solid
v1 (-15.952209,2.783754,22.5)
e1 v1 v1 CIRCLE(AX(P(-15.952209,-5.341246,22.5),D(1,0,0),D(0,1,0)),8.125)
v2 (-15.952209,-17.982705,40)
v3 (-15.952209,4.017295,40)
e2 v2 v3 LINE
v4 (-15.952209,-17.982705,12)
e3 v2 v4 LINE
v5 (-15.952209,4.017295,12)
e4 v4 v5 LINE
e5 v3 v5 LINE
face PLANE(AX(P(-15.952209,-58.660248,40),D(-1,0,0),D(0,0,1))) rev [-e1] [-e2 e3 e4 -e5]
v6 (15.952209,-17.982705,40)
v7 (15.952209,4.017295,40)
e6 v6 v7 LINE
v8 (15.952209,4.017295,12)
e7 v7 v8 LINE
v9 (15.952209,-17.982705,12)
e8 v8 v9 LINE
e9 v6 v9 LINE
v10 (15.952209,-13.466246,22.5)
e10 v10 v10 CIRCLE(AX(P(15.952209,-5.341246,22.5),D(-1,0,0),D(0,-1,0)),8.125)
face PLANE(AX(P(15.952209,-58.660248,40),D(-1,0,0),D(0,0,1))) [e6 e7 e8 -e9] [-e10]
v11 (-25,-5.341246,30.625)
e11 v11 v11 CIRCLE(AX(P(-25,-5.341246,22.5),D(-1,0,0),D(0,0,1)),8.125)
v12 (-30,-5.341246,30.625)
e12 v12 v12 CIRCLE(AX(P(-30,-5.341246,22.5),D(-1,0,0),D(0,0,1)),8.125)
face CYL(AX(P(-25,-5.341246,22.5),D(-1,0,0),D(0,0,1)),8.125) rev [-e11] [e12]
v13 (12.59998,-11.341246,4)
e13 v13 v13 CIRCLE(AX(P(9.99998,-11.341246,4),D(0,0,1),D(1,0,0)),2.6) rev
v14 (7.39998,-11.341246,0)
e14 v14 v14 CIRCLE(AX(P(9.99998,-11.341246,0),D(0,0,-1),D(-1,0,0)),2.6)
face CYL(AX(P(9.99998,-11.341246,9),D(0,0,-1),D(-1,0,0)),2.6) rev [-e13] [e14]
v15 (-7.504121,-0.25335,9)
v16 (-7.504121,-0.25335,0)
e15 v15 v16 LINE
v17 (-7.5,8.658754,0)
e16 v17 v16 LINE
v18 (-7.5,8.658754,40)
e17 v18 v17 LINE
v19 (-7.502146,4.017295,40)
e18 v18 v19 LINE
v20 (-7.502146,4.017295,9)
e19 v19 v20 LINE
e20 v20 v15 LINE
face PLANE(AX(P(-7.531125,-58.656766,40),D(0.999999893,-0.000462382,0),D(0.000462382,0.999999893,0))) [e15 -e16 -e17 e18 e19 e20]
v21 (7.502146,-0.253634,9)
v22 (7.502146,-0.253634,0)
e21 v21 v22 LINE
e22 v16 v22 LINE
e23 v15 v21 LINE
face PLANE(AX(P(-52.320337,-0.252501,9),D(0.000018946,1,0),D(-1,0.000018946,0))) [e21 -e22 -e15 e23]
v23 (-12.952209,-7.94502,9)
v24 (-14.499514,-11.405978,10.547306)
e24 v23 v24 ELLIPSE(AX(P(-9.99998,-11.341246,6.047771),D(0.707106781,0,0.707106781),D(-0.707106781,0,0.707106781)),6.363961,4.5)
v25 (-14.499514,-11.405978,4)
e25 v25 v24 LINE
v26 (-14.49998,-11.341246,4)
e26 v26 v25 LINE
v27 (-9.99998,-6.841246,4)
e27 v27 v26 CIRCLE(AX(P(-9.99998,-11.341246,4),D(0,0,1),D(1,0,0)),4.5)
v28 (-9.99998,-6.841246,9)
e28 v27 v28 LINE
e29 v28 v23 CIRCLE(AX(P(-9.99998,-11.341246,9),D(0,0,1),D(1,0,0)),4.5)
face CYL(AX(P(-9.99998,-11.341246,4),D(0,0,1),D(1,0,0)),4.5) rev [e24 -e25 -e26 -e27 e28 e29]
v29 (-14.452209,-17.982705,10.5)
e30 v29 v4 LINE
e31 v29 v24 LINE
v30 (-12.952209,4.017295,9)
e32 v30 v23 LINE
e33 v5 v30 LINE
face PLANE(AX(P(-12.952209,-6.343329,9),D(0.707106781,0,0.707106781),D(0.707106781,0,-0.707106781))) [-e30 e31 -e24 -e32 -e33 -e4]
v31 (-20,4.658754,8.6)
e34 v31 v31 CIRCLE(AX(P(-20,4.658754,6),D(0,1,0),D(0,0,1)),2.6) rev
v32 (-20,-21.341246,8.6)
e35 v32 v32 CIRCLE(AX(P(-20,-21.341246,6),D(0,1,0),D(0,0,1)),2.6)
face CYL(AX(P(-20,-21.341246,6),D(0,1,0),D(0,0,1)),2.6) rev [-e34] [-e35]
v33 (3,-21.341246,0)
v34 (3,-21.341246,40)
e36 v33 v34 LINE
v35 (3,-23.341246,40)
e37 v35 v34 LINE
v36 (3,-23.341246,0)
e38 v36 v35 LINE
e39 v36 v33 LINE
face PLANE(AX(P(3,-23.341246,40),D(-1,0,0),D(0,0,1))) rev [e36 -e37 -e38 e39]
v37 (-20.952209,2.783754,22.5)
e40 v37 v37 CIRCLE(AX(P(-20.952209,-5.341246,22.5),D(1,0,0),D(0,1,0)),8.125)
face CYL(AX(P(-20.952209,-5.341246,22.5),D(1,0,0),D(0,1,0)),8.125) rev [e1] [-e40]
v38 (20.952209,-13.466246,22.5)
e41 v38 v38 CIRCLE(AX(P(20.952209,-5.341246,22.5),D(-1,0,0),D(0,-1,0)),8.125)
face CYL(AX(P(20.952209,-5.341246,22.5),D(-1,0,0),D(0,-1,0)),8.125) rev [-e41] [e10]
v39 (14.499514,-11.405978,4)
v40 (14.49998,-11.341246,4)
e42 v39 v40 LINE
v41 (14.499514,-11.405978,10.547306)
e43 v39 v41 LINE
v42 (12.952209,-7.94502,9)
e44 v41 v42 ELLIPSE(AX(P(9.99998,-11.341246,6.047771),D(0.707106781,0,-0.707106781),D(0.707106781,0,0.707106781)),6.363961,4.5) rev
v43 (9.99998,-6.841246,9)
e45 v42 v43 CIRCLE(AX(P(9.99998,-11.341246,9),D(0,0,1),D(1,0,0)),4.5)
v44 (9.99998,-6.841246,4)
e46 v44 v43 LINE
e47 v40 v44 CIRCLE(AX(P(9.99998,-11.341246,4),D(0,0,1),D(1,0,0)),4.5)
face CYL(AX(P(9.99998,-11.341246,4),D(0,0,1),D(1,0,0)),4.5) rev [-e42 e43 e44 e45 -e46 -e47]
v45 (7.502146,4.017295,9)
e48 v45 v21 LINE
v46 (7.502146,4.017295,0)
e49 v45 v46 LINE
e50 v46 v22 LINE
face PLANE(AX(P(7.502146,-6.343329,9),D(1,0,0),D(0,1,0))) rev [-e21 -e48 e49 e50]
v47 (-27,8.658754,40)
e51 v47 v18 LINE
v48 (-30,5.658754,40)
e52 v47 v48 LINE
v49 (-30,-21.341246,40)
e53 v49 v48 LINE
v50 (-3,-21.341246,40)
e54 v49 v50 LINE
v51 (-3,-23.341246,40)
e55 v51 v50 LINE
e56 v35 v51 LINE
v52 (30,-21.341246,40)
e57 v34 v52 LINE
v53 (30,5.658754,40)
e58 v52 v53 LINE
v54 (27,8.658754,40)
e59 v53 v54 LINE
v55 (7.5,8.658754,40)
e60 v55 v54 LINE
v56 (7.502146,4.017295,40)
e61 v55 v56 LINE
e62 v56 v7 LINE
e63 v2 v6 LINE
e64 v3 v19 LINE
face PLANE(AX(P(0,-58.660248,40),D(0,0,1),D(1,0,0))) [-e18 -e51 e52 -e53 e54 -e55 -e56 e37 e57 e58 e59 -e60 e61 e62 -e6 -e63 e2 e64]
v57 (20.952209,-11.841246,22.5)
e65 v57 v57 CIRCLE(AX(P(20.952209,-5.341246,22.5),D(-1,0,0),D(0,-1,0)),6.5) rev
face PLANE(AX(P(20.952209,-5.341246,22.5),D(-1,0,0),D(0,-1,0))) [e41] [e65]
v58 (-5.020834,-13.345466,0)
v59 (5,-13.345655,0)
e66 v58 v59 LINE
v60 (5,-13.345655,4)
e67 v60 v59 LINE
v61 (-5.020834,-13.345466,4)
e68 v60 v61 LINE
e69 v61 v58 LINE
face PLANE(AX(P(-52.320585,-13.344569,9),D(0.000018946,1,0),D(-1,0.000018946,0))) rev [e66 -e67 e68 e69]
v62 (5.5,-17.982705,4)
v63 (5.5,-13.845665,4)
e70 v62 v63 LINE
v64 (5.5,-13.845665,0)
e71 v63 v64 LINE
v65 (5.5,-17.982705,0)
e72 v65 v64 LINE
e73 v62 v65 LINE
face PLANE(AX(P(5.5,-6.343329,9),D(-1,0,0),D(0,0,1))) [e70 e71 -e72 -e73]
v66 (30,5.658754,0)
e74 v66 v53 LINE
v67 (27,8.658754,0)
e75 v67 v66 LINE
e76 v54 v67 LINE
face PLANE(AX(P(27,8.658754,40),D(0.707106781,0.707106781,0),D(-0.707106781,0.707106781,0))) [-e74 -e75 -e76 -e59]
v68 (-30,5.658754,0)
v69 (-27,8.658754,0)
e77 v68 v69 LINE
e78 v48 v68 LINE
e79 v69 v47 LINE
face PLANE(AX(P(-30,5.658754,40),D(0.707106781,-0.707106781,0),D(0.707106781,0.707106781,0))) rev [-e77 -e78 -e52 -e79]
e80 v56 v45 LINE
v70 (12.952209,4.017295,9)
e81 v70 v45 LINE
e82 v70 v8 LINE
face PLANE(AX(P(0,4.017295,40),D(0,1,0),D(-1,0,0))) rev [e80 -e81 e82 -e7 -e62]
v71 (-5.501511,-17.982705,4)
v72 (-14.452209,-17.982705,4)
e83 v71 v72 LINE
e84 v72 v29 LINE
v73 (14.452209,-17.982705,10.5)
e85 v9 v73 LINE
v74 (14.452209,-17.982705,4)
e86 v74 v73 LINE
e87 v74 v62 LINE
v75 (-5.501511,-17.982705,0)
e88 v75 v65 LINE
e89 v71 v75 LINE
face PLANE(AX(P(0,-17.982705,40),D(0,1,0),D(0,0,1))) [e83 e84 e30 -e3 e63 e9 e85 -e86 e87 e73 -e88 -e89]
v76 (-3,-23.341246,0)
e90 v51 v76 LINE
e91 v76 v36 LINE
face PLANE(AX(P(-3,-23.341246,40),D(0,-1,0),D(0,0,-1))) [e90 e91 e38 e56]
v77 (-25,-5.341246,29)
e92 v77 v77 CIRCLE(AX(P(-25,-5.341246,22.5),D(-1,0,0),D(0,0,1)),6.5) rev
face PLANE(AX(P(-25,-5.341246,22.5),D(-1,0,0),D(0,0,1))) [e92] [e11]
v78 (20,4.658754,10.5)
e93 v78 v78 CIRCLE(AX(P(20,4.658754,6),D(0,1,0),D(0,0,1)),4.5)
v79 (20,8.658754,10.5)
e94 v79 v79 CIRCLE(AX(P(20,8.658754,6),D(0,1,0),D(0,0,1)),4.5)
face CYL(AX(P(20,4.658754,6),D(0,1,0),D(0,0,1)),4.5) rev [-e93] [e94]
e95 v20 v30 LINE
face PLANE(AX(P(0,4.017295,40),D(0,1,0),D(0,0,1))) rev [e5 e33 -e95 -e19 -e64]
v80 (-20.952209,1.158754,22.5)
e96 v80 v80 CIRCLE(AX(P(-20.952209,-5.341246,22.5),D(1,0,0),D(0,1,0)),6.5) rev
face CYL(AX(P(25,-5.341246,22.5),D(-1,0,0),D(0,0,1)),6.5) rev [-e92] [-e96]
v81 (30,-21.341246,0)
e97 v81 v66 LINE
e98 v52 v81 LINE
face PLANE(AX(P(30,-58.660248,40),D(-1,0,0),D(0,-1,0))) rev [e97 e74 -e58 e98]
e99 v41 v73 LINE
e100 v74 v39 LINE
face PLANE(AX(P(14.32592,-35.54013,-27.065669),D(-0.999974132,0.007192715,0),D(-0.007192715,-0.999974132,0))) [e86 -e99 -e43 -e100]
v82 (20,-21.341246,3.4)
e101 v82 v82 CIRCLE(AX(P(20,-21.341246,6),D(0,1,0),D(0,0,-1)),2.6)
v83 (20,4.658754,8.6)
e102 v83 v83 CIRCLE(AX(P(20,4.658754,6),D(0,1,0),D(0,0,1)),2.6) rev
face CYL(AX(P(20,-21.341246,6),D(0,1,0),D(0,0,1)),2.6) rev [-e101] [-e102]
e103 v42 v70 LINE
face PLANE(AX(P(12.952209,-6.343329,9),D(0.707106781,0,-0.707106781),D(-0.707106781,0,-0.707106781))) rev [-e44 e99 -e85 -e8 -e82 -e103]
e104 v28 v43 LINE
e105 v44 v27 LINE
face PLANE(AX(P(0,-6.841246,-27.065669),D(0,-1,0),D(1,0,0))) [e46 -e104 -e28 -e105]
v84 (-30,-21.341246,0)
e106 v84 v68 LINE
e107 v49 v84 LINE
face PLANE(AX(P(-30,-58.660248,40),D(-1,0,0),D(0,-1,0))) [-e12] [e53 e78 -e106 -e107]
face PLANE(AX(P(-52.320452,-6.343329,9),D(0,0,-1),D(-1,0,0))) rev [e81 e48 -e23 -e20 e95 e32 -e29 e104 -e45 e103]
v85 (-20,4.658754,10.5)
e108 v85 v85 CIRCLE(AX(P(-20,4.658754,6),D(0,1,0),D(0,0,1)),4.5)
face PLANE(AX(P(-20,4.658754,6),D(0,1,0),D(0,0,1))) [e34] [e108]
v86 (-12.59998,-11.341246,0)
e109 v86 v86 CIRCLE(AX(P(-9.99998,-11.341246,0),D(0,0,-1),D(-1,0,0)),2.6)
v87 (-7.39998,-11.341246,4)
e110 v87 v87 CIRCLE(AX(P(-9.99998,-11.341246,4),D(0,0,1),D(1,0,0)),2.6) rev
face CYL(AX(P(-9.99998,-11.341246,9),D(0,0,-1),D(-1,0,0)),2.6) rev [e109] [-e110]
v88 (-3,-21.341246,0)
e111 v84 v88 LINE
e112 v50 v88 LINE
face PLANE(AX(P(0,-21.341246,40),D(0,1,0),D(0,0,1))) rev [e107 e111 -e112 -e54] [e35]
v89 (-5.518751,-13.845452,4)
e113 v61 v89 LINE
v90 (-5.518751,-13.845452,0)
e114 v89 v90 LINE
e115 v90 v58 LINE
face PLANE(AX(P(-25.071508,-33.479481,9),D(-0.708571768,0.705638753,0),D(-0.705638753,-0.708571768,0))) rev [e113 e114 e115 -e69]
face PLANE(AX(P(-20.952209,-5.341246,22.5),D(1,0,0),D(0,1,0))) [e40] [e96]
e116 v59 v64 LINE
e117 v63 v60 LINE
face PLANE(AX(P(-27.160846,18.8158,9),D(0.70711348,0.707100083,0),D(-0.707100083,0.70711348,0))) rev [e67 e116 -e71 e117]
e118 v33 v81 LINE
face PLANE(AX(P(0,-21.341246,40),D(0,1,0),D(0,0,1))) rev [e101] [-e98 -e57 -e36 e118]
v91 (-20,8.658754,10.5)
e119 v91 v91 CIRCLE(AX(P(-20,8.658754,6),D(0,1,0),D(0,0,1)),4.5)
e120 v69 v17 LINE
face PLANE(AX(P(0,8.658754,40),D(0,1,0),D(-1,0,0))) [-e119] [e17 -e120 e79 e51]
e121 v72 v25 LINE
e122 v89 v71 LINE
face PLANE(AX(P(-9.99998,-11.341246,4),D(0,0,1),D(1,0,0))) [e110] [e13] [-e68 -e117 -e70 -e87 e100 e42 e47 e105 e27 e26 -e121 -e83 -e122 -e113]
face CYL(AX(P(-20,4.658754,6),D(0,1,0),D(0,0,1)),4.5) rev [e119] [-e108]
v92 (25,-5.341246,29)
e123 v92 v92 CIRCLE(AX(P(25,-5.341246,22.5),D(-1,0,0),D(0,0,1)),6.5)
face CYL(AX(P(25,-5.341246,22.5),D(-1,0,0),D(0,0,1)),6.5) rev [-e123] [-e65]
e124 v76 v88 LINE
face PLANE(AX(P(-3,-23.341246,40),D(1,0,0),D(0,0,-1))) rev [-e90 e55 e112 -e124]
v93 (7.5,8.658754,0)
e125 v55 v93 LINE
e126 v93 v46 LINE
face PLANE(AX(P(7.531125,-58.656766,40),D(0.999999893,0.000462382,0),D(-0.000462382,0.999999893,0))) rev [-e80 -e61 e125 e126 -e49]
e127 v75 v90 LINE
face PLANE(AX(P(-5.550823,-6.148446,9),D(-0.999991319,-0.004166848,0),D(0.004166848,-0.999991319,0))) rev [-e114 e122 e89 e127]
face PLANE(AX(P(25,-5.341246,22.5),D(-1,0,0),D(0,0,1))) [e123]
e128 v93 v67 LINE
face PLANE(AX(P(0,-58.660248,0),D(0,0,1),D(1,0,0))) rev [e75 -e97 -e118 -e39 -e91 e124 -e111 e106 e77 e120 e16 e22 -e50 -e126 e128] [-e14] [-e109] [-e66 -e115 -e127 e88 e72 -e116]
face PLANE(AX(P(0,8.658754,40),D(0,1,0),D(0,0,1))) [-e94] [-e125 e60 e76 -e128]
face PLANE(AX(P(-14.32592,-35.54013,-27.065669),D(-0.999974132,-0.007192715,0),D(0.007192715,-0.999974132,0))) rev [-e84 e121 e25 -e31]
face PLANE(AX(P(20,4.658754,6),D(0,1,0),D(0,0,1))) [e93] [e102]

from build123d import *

# Parameters (mm, degrees)
BOSS_EXTRUDE1_DEPTH = 40
SKETCH2_R           = 2.6
BOSS_EXTRUDE2_DEPTH = 9
SKETCH3_R           = 4.5
CUT_EXTRUDE1_DEPTH  = 5
SKETCH4_R           = 2.6
CUT_EXTRUDE2_DEPTH  = 59.309518948
CHAMFER1_SIZE       = 3
SKETCH5_R           = 6.5
CUT_EXTRUDE3_DEPTH  = 55
SKETCH6_R           = 8.125
CUT_EXTRUDE4_DEPTH  = 5
CUT_EXTRUDE5_START  = -5
SKETCH7_R           = 8.125
CUT_EXTRUDE5_DEPTH  = 5
SKETCH8_R           = 8.125
CUT_EXTRUDE6_DEPTH  = 5
SKETCH9_R           = 4.5
CUT_EXTRUDE7_DEPTH  = 4
CHAMFER2_SIZE       = 3
SKETCH10_W          = 6
SKETCH10_H          = 40
BOSS_EXTRUDE3_DEPTH = 2
CUT_EXTRUDE8_DEPTH  = 5
CUT_EXTRUDE9_DEPTH  = 36


with BuildPart() as part:
    # Sketch1 → Boss-Extrude1 (new body)
    with BuildSketch(Plane.XY):
        Polygon((30, -21.341245707), (30, 8.658754293), (7.5, 8.658754293), (7.502146126, 4.017294787), (15.952208639, 4.017294787), (15.952208639, -17.982705213), (-15.952208639, -17.982705213), (-15.952208639, 4.017294787), (-7.502146126, 4.017294787), (-7.5, 8.658754293), (-30, 8.658754293), (-30, -21.341245707), align=None)
    extrude(amount=BOSS_EXTRUDE1_DEPTH)

    # Sketch2 → Boss-Extrude2 (add)
    with BuildSketch(Plane(origin=(0, 0, 0), x_dir=(-1, 0, 0), z_dir=(0, 0, -1))):
        Polygon((-7.502146126, -0.25363415), (-7.502146126, 4.017294787), (-15.952208639, 4.017294787), (-15.952208639, -17.982705213), (-5.499999997, -17.982705213), (-5.499999997, -13.845664874), (-4.999999997, -13.345655401), (5.020834238, -13.345465543), (5.518750814, -13.845451729), (5.50151136, -17.982705213), (15.952208639, -17.982705213), (15.952208639, 4.017294787), (7.502146126, 4.017294787), (7.504120794, -0.253349836), align=None)
        with Locations((-9.99998, -11.341245707)):
            Circle(SKETCH2_R, mode=Mode.SUBTRACT)
        with Locations((9.99998, -11.341245707)):
            Circle(SKETCH2_R, mode=Mode.SUBTRACT)
    extrude(amount=-BOSS_EXTRUDE2_DEPTH)

    # Sketch3 → Cut-Extrude1 (cut)
    with BuildSketch(Plane.XY.offset(9)):
        with Locations((-9.99998, -11.341245707)):
            Circle(SKETCH3_R)
        with Locations((9.99998, -11.341245707)):
            Circle(SKETCH3_R)
    extrude(amount=-CUT_EXTRUDE1_DEPTH, mode=Mode.SUBTRACT)

    # Sketch4 → Cut-Extrude2 (cut, through all)
    with BuildSketch(Plane(origin=(0, 8.658754293, 0), x_dir=(1, 0, 0), z_dir=(0, 1, 0))):
        with Locations(Location((-20, -6, 0), (0, 0, 270))):
            Circle(SKETCH4_R)
        with Locations(Location((20, -6, 0), (0, 0, 90))):
            Circle(SKETCH4_R)
    extrude(amount=-CUT_EXTRUDE2_DEPTH, mode=Mode.SUBTRACT)

    # Chamfer1
    # the kernel refuses this chamfer: 3 mm, written as the material it adds along each edge
    with BuildSketch(Plane(origin=(15.952208639, 4.017294787, 9), x_dir=(0.02749587661058678, 0, 0.9996219169112968), z_dir=(0, -1, 0))) as chamfer1_piece_1_section:
        Polygon((CHAMFER1_SIZE * 0.999621916911, CHAMFER1_SIZE * 0.0274958766106), (-CHAMFER1_SIZE * 0.0274958766106, CHAMFER1_SIZE * 0.999621916911), (0, 0), align=None)
    chamfer1_piece_1 = extrude(amount=22, mode=Mode.PRIVATE)
    chamfer1_piece_1 = chamfer1_piece_1 - Plane(origin=(9.99998, -11.341245707, 10.026917349), x_dir=(1, 0, 0), z_dir=(0, 0, 1)) * Cylinder(4.5, 56, mode=Mode.PRIVATE)
    add(chamfer1_piece_1)
    with BuildSketch(Plane(origin=(-15.952208639, -17.982705213, 9), x_dir=(-0.02749587661058678, 0, 0.9996219169112968), z_dir=(0, 1, 0))) as chamfer1_piece_2_section:
        Polygon((CHAMFER1_SIZE * 0.999621916911, CHAMFER1_SIZE * 0.0274958766106), (-CHAMFER1_SIZE * 0.0274958766106, CHAMFER1_SIZE * 0.999621916911), (0, 0), align=None)
    chamfer1_piece_2 = extrude(amount=22, mode=Mode.PRIVATE)
    chamfer1_piece_2 = chamfer1_piece_2 - Plane(origin=(-9.99998, -11.341245707, 10.026917349), x_dir=(1, 0, 0), z_dir=(0, 0, 1)) * Cylinder(4.5, 56, mode=Mode.PRIVATE)
    add(chamfer1_piece_2)

    # Sketch5 → Cut-Extrude3 (cut)
    with BuildSketch(Plane.ZY.offset(30)):
        with Locations((22.5, -5.341245707)):
            Circle(SKETCH5_R)
    extrude(amount=-CUT_EXTRUDE3_DEPTH, mode=Mode.SUBTRACT)

    # Sketch6 → Cut-Extrude4 (cut)
    with BuildSketch(Plane.ZY.offset(30)):
        with Locations((22.5, -5.341245707)):
            Circle(SKETCH6_R)
    extrude(amount=-CUT_EXTRUDE4_DEPTH, mode=Mode.SUBTRACT)

    # Sketch7 → Cut-Extrude5 (cut)
    with BuildSketch(Plane(origin=(-15.952208639, 0, 0), x_dir=(0, 0, -1), z_dir=(1, 0, 0)).offset(CUT_EXTRUDE5_START)):
        with Locations(Location((-22.5, -5.341245707, 0), (0, 0, 180))):
            Circle(SKETCH7_R)
    extrude(amount=CUT_EXTRUDE5_DEPTH, mode=Mode.SUBTRACT)

    # Sketch8 → Cut-Extrude6 (cut)
    with BuildSketch(Plane.ZY.offset(-15.952208639)):
        with Locations((22.5, -5.341245707)):
            Circle(SKETCH8_R)
    extrude(amount=-CUT_EXTRUDE6_DEPTH, mode=Mode.SUBTRACT)

    # Sketch9 → Cut-Extrude7 (cut)
    with BuildSketch(Plane(origin=(0, 8.658754293, 0), x_dir=(1, 0, 0), z_dir=(0, 1, 0))):
        with Locations(Location((20, -6, 0), (0, 0, 270))):
            Circle(SKETCH9_R)
        with Locations(Location((-20, -6, 0), (0, 0, 270))):
            Circle(SKETCH9_R)
    extrude(amount=-CUT_EXTRUDE7_DEPTH, mode=Mode.SUBTRACT)

    # Chamfer2
    chamfer2_edges = [part.edges().sort_by_distance(p)[0] for p in [
        (30, 8.658754293, 20),
        (-30, 8.658754293, 20),
    ]]
    chamfer(chamfer2_edges, length=CHAMFER2_SIZE)

    # Sketch10 → Boss-Extrude3 (add)
    with BuildSketch(Plane.XZ.offset(21.341245707)):
        with Locations((0, 20)):
            Rectangle(SKETCH10_W, SKETCH10_H)
    extrude(amount=BOSS_EXTRUDE3_DEPTH)

    # Sketch11 → Cut-Extrude8 (cut)
    with BuildSketch(Plane.XY.offset(9)):
        with BuildLine():
            Line((9.99998, -6.841245707), (-9.99998, -6.841245707))
            ThreePointArc((-9.99998, -6.841245707), (-5.784946566, -12.917155968), (-12.952208639, -14.737470974))
            Line((-12.952208639, -14.737470974), (-12.952208639, -17.982705213))
            Line((-12.952208639, -17.982705213), (-5.50151136, -17.982705213))
            Line((-5.50151136, -17.982705213), (-5.518750814, -13.845451729))
            Line((-5.518750814, -13.845451729), (-5.020834238, -13.345465543))
            Line((-5.020834238, -13.345465543), (4.999999997, -13.345655401))
            Line((4.999999997, -13.345655401), (5.499999997, -13.845664874))
            Line((5.499999997, -13.845664874), (5.499999997, -17.982705213))
            Line((5.499999997, -17.982705213), (12.952208639, -17.982705213))
            Line((12.952208639, -17.982705213), (12.952208639, -14.737470974))
            ThreePointArc((12.952208639, -14.737470974), (5.784946566, -12.917155968), (9.99998, -6.841245707))
        make_face()
        with BuildLine():
            Line((-12.952208639, -17.982705213), (-12.952208639, -14.737470974))
            ThreePointArc((-12.952208639, -14.737470974), (-14.081267005, -13.236792167), (-14.499514384, -11.405978467))
            Line((-14.499514384, -11.405978467), (-14.452208639, -17.982705213))
            Line((-14.452208639, -17.982705213), (-12.952208639, -17.982705213))
        make_face()
        with BuildLine():
            ThreePointArc((14.499514384, -11.405978467), (14.081267005, -13.236792167), (12.952208639, -14.737470974))
            Line((12.952208639, -14.737470974), (12.952208639, -17.982705213))
            Line((12.952208639, -17.982705213), (14.452208639, -17.982705213))
            Line((14.452208639, -17.982705213), (14.499514384, -11.405978467))
        make_face()
    extrude(amount=-CUT_EXTRUDE8_DEPTH, mode=Mode.SUBTRACT)

    # Sketch13 → Cut-Extrude9 (cut)
    with BuildSketch(Plane.XY.offset(40)):
        Polygon((-14.49998, -11.341245707), (-14.452208639, -17.982705213), (14.452208639, -17.982705213), (14.49998, -11.341245707), align=None)
    extrude(amount=-CUT_EXTRUDE9_DEPTH, mode=Mode.SUBTRACT)


solid = part.part
